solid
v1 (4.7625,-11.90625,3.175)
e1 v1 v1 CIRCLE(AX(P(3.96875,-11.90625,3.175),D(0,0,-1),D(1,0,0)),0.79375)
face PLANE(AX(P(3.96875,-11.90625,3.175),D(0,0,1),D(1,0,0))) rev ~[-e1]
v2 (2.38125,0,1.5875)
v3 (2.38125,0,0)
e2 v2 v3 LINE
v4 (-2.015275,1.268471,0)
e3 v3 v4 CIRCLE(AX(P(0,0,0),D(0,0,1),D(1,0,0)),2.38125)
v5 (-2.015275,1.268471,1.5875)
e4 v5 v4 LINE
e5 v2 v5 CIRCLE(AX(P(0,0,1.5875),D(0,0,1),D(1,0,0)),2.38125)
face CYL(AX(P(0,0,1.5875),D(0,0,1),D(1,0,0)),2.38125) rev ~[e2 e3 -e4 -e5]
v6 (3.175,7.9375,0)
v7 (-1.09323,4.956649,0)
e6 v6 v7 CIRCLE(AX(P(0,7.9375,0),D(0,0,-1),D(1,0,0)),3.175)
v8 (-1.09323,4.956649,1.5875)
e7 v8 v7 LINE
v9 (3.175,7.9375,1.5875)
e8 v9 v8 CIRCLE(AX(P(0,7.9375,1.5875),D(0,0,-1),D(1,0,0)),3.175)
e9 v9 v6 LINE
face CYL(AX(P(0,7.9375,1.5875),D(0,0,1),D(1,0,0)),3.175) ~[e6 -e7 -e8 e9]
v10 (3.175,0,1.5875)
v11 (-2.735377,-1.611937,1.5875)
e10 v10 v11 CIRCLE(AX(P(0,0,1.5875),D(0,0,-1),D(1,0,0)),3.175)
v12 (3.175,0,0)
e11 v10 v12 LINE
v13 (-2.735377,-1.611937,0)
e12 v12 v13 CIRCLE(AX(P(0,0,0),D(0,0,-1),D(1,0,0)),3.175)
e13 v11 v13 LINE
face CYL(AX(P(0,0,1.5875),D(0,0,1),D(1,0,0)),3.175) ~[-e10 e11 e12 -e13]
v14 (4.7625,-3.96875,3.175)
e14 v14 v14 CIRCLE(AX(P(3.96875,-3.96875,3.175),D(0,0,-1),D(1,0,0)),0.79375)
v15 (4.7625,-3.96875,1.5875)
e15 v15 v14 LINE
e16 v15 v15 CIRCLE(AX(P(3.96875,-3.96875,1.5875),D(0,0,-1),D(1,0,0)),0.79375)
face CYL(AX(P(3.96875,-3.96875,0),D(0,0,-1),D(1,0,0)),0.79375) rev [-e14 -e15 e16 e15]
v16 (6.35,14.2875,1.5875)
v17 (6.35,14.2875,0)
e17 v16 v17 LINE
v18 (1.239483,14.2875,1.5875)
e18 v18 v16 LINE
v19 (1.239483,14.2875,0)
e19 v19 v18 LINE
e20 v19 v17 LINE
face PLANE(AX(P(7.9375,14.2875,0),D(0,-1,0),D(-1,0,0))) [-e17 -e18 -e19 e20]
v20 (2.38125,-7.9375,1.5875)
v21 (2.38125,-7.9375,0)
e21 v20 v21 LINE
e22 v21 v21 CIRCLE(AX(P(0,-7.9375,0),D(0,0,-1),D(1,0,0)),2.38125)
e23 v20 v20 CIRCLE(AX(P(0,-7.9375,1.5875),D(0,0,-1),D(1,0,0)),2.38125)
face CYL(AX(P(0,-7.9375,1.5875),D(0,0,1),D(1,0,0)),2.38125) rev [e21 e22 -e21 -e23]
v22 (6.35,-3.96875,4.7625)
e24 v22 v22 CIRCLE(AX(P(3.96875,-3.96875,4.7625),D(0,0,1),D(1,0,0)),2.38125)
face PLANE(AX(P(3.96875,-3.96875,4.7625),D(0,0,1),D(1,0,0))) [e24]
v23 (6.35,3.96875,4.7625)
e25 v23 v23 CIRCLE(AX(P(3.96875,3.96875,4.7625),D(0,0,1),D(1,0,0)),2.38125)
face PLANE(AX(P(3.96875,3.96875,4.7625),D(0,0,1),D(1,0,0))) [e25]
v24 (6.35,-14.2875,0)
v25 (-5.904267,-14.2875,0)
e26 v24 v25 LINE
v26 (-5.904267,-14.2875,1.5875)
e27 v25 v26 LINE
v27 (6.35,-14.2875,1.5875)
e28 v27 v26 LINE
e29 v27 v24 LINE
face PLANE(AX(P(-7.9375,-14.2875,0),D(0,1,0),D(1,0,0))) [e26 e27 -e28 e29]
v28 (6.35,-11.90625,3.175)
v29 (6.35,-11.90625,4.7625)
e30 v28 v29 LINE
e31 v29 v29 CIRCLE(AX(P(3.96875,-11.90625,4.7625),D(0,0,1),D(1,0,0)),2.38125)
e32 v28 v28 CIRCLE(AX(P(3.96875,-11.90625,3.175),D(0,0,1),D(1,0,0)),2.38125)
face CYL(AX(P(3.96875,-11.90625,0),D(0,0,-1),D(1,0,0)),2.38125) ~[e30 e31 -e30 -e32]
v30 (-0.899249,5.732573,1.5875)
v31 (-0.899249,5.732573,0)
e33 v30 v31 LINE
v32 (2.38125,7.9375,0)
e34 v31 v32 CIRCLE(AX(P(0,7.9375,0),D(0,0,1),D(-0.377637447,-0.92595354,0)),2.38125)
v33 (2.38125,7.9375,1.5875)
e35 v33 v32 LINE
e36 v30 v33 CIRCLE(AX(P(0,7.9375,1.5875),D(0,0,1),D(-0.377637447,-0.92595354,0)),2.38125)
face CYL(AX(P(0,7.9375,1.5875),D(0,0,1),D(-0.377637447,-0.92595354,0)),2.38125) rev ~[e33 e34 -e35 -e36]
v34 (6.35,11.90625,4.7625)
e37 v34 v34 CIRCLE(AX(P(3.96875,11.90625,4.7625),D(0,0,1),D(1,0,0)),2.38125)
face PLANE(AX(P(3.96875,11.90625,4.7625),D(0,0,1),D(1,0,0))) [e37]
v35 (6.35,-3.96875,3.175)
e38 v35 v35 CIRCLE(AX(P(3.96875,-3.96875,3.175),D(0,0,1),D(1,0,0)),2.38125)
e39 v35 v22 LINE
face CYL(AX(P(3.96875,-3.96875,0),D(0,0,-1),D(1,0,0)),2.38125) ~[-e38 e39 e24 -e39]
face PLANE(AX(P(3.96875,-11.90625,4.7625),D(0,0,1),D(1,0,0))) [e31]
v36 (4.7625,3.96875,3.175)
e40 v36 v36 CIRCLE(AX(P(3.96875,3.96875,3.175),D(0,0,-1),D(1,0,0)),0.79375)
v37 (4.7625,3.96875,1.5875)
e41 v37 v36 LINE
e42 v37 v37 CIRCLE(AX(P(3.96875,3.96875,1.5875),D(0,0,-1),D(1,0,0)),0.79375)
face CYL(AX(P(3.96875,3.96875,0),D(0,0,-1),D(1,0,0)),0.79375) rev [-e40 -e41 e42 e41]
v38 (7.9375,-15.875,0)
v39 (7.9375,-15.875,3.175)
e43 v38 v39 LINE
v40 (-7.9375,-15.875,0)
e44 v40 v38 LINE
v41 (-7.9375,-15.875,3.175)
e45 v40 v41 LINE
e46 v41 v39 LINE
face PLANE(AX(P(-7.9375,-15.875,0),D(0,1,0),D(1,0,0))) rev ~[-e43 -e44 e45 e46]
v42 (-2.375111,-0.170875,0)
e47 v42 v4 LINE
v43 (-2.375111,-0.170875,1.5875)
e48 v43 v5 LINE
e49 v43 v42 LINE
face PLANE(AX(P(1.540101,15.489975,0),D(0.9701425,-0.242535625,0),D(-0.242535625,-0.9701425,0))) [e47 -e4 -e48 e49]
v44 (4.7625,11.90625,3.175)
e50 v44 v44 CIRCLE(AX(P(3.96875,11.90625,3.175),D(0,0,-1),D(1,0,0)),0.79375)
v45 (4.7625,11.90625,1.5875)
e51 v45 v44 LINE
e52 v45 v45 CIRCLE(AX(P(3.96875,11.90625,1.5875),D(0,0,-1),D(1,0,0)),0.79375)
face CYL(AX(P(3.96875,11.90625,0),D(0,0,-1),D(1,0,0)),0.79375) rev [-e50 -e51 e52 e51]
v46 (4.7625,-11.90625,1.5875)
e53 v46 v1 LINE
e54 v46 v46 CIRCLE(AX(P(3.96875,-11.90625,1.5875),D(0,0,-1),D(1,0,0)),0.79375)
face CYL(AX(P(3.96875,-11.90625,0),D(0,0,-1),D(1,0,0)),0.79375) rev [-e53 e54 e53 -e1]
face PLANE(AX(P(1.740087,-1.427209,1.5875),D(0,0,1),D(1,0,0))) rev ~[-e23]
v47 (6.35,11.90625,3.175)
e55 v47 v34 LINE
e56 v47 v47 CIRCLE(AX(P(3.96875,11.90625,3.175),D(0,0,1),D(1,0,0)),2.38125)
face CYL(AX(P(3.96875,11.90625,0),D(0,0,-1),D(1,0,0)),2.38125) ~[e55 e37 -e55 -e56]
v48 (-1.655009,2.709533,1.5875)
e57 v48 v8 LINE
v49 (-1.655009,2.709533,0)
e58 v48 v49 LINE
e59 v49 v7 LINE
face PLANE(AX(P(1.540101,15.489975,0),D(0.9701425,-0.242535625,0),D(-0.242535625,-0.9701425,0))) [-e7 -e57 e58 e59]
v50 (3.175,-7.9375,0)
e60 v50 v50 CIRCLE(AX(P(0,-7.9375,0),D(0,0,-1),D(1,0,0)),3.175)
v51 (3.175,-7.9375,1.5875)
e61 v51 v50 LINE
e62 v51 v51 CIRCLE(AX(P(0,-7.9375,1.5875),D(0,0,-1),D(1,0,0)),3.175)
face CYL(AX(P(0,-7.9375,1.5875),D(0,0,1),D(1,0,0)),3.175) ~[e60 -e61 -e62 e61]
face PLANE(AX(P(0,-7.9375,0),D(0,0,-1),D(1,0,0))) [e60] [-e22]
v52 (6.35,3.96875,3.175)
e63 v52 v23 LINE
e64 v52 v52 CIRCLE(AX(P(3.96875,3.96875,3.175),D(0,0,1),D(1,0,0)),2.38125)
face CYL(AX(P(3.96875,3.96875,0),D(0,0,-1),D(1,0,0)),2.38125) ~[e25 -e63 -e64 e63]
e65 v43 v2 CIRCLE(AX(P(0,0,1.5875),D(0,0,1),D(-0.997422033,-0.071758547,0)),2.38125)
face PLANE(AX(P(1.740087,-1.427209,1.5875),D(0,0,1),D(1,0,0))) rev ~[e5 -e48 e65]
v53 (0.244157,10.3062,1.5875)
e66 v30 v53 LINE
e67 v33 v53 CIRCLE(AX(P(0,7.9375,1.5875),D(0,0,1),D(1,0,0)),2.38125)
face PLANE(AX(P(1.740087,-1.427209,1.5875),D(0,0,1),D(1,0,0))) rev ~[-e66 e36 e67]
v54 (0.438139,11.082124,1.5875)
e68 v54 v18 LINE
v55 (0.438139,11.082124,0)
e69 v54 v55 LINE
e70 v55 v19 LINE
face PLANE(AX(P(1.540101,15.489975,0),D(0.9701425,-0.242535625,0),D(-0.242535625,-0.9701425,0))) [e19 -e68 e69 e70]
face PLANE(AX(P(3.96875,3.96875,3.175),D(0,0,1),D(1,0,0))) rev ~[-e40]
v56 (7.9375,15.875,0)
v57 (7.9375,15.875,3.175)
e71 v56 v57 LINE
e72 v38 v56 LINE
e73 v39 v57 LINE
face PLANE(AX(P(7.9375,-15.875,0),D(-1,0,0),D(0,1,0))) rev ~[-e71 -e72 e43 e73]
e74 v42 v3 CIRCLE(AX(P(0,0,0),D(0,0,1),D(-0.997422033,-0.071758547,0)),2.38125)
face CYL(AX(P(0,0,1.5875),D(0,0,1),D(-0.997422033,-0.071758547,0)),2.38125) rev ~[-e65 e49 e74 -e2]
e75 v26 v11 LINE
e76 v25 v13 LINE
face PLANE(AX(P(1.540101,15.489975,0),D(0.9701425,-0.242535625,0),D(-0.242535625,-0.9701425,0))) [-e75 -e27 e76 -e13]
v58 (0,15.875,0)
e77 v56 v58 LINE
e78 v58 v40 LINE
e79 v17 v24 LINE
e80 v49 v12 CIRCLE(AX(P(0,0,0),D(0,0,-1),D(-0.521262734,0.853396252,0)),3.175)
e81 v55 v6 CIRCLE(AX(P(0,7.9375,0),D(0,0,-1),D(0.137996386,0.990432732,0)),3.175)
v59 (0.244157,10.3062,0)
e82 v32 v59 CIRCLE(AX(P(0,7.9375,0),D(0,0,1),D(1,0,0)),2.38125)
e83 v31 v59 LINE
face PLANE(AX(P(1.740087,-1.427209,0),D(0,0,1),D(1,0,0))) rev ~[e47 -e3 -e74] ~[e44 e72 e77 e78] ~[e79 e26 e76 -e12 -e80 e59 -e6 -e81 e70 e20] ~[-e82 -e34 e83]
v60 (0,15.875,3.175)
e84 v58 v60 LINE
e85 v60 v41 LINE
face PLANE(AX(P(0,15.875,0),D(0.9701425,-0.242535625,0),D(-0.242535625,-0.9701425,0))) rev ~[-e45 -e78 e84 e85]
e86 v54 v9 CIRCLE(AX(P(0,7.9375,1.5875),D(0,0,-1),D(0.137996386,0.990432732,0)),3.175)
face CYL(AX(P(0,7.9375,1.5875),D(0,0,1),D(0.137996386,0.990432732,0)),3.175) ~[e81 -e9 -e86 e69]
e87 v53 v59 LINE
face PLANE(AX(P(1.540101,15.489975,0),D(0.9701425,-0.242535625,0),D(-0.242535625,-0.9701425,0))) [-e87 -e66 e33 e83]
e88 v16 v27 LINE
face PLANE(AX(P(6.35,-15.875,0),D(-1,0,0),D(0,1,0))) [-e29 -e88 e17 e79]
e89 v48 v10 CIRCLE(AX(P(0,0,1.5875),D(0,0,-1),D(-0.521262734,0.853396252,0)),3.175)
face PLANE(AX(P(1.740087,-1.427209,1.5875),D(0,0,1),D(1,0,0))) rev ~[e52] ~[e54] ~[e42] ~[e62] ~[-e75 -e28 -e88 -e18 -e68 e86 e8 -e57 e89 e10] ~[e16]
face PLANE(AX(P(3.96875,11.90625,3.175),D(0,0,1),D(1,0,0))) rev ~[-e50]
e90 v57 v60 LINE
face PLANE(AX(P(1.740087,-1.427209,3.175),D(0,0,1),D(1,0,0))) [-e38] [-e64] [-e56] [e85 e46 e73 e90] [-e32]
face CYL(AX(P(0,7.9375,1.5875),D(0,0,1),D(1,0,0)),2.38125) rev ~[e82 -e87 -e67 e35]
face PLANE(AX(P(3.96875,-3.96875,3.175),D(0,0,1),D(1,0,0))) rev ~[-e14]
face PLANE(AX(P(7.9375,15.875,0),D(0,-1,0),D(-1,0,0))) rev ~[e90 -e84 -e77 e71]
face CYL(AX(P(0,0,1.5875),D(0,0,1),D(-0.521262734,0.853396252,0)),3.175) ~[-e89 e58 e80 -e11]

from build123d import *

# Parameters (mm, degrees)
F0_R     = 2.38125
F1_DEPTH = 3.175
F2_DEPTH = 4.7625
F3_T     = -1.5875
F4_R     = 3.175
F4_R_2   = 2.38125
F5_DEPTH = 1.5875


with BuildPart() as f1:
    # F0 (on Top) → F1 (new body)
    with BuildSketch(Plane.XY):
        Polygon((7.9375, 15.875), (0, 15.875), (-7.9375, -15.875), (7.9375, -15.875), align=None)
        with Locations((3.96875, -11.90625)):
            Circle(F0_R, mode=Mode.SUBTRACT)
        with Locations((3.96875, -3.96875)):
            Circle(F0_R, mode=Mode.SUBTRACT)
        with Locations((3.96875, 3.96875)):
            Circle(F0_R, mode=Mode.SUBTRACT)
        with Locations((3.96875, 11.90625)):
            Circle(F0_R, mode=Mode.SUBTRACT)
    extrude(amount=F1_DEPTH)

    # F0 (on Top) → F2 (join)
    with BuildSketch(Plane.XY):
        with Locations((3.96875, 11.90625)):
            Circle(F0_R)
        with Locations((3.96875, 3.96875)):
            Circle(F0_R)
        with Locations((3.96875, -3.96875)):
            Circle(F0_R)
        with Locations((3.96875, -11.90625)):
            Circle(F0_R)
    extrude(amount=F2_DEPTH)

    # F3
    f3_openings = [f1.faces().sort_by_distance(p)[0] for p in [
        (1.763889, -1.763889, 0),
    ]]
    offset(amount=F3_T, openings=f3_openings, kind=Kind.INTERSECTION)

    # F4 (on face) → F5 (join)
    with BuildSketch(Plane(origin=(0, 0, 1.5875), x_dir=(1, 0, 0), z_dir=(0, 0, -1))):
        with BuildLine():
            ThreePointArc((0.4381385265, -11.0821239253), (2.3949650124, -10.0219106095), (3.175, -7.9375))
            ThreePointArc((3.175, -7.9375), (1.8179135149, -5.3344603437), (-1.0932302062, -4.9566489946))
            Line((-1.0932302062, -4.9566489946), (-0.8992491716, -5.7325731328))
            ThreePointArc((-0.8992491716, -5.7325731328), (1.3283475585, -5.9611790933), (2.38125, -7.9375))
            ThreePointArc((2.38125, -7.9375), (1.7680146479, -9.5326413001), (0.244157492, -10.3061997871))
            Line((0.244157492, -10.3061997871), (0.4381385265, -11.0821239253))
        make_face()
        with BuildLine():
            Line((-2.0152745824, -1.2684714896), (-1.6550091801, -2.7095330988))
            ThreePointArc((-1.6550091801, -2.7095330988), (1.5533787132, -2.7690503017), (3.175, 0))
            ThreePointArc((3.175, 0), (0.8354053628, 3.0631230599), (-2.7353766172, 1.6119366495))
            Line((-2.7353766172, 1.6119366495), (-2.3751112149, 0.1708750402))
            ThreePointArc((-2.3751112149, 0.1708750402), (0.0854926372, 2.3797148089), (2.38125, 0))
            ThreePointArc((2.38125, 0), (0.6601056594, -2.2879274641), (-2.0152745824, -1.2684714896))
        make_face()
        with Locations((0, 7.9375)):
            Circle(F4_R)
        with Locations((0, 7.9375)):
            Circle(F4_R_2, mode=Mode.SUBTRACT)
    extrude(amount=F5_DEPTH)


solid = f1.part
